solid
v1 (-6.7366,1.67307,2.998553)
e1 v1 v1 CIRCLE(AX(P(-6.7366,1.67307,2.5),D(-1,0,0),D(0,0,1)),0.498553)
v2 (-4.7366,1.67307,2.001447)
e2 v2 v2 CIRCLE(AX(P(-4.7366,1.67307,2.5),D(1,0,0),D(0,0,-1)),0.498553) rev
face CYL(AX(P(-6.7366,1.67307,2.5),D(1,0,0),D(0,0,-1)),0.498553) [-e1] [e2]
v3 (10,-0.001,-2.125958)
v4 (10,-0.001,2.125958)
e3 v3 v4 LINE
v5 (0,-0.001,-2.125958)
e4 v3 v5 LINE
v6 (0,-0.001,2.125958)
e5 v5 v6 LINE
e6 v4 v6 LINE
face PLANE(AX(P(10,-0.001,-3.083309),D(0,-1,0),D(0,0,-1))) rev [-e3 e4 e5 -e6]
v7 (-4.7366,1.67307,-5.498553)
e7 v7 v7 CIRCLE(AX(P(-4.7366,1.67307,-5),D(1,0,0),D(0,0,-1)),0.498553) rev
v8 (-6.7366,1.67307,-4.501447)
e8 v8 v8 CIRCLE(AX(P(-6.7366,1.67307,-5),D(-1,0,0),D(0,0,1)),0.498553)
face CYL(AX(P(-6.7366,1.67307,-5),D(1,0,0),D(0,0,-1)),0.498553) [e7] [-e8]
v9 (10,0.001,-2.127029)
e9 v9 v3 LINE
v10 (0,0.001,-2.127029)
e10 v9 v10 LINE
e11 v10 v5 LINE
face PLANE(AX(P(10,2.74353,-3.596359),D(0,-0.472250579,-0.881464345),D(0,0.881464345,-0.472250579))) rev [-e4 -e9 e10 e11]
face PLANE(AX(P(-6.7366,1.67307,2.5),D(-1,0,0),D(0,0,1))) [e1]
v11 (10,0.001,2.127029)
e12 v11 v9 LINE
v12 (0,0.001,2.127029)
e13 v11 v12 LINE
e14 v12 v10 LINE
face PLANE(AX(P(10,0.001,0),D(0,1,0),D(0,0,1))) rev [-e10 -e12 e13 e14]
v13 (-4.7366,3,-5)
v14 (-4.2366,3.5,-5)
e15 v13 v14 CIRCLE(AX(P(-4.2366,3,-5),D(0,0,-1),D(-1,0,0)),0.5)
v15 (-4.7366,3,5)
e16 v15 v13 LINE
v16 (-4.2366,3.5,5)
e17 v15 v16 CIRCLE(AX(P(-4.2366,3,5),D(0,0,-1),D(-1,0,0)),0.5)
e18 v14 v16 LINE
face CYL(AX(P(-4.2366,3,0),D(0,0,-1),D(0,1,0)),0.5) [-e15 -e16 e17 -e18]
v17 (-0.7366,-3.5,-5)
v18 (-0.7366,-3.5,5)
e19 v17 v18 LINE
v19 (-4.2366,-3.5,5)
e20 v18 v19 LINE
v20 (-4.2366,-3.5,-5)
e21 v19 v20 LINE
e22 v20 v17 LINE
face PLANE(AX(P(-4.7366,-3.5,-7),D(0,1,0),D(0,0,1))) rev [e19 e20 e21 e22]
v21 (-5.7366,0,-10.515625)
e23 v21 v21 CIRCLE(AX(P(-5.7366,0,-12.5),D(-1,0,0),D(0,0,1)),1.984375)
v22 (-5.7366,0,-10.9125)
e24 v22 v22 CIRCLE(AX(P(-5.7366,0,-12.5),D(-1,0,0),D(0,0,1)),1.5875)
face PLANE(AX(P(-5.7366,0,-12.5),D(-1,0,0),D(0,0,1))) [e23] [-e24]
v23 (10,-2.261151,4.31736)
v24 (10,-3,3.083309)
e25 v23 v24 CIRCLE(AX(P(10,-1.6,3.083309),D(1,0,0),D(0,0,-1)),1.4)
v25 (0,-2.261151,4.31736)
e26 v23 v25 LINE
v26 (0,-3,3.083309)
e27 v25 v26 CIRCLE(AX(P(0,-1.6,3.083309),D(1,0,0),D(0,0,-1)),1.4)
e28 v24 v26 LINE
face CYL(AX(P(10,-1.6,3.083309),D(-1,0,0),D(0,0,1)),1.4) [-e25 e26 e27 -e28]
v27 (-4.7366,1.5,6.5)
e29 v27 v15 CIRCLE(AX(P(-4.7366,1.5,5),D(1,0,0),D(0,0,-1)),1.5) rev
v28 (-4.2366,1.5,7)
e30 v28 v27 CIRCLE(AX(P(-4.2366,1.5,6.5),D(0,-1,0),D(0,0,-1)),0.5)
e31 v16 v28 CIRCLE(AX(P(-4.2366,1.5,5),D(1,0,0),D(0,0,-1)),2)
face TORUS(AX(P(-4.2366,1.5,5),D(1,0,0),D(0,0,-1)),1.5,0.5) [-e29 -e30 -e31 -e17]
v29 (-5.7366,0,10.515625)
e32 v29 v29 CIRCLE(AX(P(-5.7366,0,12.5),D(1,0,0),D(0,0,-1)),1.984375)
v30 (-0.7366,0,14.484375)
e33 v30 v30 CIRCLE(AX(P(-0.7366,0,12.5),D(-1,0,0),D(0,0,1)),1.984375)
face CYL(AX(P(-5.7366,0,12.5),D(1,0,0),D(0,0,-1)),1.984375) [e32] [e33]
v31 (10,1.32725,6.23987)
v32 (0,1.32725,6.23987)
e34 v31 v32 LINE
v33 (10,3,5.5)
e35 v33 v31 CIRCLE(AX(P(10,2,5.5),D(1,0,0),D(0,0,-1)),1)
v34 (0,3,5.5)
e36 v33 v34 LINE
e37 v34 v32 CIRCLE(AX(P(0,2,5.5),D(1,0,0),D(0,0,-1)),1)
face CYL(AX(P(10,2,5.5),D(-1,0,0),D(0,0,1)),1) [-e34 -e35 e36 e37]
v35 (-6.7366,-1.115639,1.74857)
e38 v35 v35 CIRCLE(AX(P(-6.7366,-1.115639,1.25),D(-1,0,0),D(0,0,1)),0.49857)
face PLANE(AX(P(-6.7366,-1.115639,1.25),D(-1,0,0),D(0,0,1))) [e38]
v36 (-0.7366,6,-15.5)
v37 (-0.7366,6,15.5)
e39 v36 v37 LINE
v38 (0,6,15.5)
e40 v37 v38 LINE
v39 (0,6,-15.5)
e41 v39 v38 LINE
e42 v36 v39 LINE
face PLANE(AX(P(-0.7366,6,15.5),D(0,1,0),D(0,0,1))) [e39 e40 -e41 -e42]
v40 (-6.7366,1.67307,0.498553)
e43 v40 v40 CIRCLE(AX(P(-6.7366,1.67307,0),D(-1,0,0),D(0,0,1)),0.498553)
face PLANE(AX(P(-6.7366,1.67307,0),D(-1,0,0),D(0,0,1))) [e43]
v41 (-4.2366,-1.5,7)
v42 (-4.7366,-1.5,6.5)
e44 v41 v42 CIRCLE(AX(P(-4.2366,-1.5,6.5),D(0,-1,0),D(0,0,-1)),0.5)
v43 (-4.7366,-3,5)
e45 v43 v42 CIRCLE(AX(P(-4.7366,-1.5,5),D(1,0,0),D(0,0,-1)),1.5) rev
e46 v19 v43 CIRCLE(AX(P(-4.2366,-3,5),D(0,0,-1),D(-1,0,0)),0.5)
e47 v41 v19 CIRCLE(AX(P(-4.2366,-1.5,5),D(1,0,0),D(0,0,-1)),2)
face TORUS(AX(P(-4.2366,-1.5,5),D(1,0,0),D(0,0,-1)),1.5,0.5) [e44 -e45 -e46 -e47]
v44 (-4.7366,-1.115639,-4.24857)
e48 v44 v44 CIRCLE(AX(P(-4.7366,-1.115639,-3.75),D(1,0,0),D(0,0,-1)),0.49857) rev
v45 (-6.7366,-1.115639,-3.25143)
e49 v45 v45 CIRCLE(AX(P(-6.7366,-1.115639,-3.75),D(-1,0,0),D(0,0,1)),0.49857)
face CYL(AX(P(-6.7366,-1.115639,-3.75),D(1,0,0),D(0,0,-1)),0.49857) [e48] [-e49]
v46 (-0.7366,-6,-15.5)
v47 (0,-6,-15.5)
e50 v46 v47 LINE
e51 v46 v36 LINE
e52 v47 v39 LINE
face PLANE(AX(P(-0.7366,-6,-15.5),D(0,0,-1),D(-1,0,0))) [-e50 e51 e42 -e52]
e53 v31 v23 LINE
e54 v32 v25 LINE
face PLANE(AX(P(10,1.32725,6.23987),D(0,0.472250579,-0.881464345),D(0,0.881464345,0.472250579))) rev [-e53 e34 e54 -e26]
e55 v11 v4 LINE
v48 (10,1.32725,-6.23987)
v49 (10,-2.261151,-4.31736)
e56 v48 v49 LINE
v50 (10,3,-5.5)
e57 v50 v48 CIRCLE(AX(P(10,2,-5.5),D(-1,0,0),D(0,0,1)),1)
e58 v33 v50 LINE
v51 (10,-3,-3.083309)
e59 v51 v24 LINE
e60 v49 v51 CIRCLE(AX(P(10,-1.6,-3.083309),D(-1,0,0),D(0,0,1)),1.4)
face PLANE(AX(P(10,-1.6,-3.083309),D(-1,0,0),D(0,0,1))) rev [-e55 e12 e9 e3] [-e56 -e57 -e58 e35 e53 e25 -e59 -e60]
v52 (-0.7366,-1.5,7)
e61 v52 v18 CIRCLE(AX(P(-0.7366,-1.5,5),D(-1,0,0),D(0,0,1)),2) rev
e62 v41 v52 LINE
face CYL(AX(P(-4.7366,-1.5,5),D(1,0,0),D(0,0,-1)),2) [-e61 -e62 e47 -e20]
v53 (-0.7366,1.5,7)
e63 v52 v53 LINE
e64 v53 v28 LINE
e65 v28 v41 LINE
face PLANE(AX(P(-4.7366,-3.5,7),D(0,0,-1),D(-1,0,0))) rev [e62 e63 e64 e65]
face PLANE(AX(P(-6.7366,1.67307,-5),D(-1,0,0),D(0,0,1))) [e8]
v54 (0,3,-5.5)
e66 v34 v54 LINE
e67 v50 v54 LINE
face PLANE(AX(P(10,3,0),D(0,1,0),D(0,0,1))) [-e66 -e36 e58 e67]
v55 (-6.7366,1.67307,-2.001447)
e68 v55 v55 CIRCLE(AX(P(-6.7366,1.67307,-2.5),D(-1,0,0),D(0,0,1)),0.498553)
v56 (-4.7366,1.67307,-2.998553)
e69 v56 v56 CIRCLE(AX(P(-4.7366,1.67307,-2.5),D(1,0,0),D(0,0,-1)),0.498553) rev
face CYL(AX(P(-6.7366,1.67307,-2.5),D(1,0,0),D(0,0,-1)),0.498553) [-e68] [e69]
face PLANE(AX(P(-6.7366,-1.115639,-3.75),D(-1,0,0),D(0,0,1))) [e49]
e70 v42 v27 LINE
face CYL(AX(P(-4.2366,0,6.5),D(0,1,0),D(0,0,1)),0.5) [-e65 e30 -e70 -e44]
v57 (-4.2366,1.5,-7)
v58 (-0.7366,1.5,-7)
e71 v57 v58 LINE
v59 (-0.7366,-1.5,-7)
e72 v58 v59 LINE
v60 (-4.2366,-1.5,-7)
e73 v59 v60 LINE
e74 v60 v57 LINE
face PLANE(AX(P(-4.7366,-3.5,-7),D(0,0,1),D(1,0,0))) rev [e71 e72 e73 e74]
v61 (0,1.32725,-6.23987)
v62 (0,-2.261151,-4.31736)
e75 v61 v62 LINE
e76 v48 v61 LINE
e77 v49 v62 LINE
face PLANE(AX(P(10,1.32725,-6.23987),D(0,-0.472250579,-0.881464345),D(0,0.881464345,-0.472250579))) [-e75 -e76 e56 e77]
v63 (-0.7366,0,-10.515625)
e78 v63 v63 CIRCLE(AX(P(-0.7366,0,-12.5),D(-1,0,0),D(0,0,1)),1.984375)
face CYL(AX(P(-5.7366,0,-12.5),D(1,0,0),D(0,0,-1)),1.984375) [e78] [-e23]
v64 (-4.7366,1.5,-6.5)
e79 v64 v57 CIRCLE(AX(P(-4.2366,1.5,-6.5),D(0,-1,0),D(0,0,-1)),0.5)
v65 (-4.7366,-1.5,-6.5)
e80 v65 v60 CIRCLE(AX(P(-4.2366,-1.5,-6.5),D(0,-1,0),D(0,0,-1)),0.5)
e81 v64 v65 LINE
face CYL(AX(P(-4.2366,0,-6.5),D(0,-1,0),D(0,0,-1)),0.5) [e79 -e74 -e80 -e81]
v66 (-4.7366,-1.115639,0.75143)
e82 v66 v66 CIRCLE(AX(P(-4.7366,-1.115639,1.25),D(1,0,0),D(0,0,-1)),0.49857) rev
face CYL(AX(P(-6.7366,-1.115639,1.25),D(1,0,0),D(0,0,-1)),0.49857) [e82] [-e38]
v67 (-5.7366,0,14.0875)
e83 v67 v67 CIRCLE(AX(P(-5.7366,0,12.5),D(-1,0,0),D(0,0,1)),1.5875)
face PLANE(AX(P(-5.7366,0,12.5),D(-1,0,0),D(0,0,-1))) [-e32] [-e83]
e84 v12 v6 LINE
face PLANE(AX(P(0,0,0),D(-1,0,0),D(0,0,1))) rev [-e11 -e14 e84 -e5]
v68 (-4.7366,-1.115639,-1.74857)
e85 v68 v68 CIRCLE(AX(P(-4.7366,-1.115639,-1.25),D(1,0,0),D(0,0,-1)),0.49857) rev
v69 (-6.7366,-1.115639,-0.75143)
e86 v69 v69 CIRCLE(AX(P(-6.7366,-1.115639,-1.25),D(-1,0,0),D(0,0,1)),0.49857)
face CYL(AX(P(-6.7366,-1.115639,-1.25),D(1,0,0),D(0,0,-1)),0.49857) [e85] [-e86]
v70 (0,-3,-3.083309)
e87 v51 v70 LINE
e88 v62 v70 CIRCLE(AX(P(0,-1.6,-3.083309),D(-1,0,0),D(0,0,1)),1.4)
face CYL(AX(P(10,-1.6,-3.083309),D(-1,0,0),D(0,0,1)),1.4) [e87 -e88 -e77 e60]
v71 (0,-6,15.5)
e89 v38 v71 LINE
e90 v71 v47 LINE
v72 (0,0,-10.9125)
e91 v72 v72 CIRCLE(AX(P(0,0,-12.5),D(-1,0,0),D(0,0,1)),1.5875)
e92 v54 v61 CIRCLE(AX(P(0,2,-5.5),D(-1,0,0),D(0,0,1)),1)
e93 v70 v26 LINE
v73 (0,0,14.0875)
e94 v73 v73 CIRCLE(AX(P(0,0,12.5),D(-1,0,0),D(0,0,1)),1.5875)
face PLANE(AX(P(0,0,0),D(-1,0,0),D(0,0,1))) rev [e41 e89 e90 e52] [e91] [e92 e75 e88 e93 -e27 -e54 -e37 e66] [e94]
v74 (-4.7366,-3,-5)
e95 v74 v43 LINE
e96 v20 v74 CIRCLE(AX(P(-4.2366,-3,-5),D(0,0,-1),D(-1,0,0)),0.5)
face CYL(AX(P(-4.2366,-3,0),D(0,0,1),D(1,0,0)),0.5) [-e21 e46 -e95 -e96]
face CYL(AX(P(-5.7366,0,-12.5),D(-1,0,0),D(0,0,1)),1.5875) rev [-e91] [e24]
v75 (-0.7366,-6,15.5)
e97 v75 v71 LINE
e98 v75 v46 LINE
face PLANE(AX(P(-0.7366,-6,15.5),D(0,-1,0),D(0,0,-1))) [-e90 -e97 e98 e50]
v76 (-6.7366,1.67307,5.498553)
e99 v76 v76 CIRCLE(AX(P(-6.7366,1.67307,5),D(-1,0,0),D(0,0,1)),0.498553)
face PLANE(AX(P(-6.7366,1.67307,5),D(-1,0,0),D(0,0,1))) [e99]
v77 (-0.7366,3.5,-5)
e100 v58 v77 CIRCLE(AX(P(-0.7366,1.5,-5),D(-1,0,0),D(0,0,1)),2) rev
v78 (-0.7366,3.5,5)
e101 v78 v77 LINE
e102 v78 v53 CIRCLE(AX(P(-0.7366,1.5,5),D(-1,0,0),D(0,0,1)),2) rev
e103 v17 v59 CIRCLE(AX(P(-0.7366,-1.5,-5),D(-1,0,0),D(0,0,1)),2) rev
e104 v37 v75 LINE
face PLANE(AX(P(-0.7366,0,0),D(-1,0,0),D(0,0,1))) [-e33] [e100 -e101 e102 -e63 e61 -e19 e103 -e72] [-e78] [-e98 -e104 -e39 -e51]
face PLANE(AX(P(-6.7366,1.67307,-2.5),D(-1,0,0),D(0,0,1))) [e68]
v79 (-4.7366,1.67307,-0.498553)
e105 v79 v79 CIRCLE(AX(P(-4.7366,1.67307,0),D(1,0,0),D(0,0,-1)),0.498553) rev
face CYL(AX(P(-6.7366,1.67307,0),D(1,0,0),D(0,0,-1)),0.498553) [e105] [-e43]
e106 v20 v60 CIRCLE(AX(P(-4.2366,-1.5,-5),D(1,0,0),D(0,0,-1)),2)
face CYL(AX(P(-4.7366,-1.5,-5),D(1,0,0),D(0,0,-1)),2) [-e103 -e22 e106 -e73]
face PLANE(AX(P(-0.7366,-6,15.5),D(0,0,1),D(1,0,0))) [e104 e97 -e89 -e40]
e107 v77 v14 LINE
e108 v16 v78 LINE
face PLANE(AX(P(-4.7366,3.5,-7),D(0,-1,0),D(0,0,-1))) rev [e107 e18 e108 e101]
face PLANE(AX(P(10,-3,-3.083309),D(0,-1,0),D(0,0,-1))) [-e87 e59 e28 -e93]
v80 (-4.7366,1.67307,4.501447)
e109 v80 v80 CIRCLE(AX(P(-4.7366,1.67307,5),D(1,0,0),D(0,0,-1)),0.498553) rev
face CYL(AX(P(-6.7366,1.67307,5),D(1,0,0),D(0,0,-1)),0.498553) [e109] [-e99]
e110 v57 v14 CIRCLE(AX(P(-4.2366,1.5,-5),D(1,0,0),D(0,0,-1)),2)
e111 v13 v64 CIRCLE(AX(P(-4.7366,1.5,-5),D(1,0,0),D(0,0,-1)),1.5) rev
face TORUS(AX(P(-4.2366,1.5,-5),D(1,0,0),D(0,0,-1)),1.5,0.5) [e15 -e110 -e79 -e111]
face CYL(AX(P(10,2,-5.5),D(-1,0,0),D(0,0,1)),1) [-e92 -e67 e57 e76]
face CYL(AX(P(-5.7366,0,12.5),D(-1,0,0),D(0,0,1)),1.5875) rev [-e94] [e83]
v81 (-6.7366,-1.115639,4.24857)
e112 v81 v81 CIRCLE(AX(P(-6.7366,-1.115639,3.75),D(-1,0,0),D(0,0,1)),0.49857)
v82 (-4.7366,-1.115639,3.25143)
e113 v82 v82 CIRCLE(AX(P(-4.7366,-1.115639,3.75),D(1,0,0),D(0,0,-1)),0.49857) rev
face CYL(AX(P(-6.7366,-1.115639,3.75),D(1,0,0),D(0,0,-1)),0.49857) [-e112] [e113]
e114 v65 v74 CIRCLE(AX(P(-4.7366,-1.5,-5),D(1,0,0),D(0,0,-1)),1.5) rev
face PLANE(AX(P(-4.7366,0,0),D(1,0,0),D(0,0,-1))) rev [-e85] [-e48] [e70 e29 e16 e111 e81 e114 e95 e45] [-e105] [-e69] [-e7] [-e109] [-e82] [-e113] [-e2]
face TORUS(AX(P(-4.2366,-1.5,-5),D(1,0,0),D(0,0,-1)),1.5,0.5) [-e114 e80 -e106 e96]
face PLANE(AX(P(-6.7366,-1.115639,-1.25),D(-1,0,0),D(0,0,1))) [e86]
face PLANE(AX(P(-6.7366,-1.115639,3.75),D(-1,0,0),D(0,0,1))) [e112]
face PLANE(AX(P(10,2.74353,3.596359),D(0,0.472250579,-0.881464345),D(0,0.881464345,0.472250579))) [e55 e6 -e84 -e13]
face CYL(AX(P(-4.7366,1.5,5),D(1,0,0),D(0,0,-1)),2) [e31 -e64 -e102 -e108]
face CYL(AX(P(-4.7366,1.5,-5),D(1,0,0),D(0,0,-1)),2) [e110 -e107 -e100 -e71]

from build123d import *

# Parameters (mm, degrees)
SKETCH1_W                    = 31
SKETCH1_H                    = 12
BASE_FLANGE1_DEPTH           = 0.7366
EXTRUDE_THIN3_DEPTH          = 10
SKETCH8_W                    = 14
SKETCH8_H                    = 7
BOSS_EXTRUDE1_DEPTH          = 4
FILLET2_R                    = 2
FILLET3_R                    = 0.5
SKETCH9_R                    = 0.498553058
BOSS_EXTRUDE2_DEPTH          = 2
SKETCH10_R                   = 0.49857
BOSS_EXTRUDE3_DEPTH          = 2
SKETCH11_R                   = 1.984375
BOSS_EXTRUDE4_DEPTH          = 5
F_1_8_0_125_DIAMETER_HOLE1_D = 3.175


# Sheet-metal steps are written as plain solids
with BuildPart() as part:
    # Sketch1 → Base-Flange1 (new body)
    with BuildSketch(Plane(origin=(0, 0, 0), x_dir=(0, 0, -1), z_dir=(1, 0, 0))):
        Rectangle(SKETCH1_W, SKETCH1_H)
    extrude(amount=-BASE_FLANGE1_DEPTH)

    # Sketch6 → Extrude-Thin3 (add)
    with BuildSketch(Plane(origin=(0, 0, 0), x_dir=(0, 0, -1), z_dir=(1, 0, 0))):
        with BuildLine():
            Line((0, 3), (5.5, 3))
            ThreePointArc((5.5, 3), (6.414535338, 2.404506015), (6.23987009, 1.327250232))
            Line((6.23987009, 1.327250232), (4.317359578, -2.26115081))
            ThreePointArc((4.317359578, -2.26115081), (3.802471809, -2.801168417), (3.083309495, -3))
            Line((3.083309495, -3), (0, -3))
            Line((0, -3), (0, -0.001))
            Line((0, -0.001), (2.125957868, -0.001))
            Line((2.125957868, -0.001), (2.127029382, 0.001))
            Line((2.127029382, 0.001), (0, 0.001))
            Line((0, 0.001), (0, 3))
        make_face()
    extrude_thin3 = extrude(amount=EXTRUDE_THIN3_DEPTH)

    # Mirror1: Extrude-Thin3 across plane
    add(extrude_thin3.mirror(Plane.XY))

    # Sketch8 → Boss-Extrude1 (add)
    with BuildSketch(Plane.ZY.offset(0.7366)):
        Rectangle(SKETCH8_W, SKETCH8_H)
    extrude(amount=BOSS_EXTRUDE1_DEPTH)

    # Fillet2
    fillet2_edges = [part.edges().sort_by_distance(p)[0] for p in [
        (-2.7366, -3.5, 7),
        (-2.7366, 3.5, 7),
        (-2.7366, 3.5, -7),
        (-2.7366, -3.5, -7),
    ]]
    fillet(fillet2_edges, radius=FILLET2_R)

    # Fillet3
    fillet3_edges = [part.edges().sort_by_distance(p)[0] for p in [
        (-4.7366, 0, 7),
        (-4.7366, -3.5, 0),
        (-4.7366, 3.5, 0),
        (-4.7366, 0, -7),
        (-4.7366, 2.914213562, -6.414213562),
        (-4.7366, -2.914213562, -6.414213562),
        (-4.7366, 2.914213562, 6.414213562),
        (-4.7366, -2.914213562, 6.414213562),
    ]]
    fillet(fillet3_edges, radius=FILLET3_R)

    # Sketch9 → Boss-Extrude2 (add)
    with BuildSketch(Plane.ZY.offset(4.7366)):
        with Locations(Location((-5, 1.673069628, 0), (0, 0, 180))):
            Circle(SKETCH9_R)
        with Locations(Location((-2.5, 1.673069628, 0), (0, 0, 180))):
            Circle(SKETCH9_R)
        with Locations(Location((0, 1.673069628, 0), (0, 0, 180))):
            Circle(SKETCH9_R)
        with Locations(Location((2.5, 1.673069628, 0), (0, 0, 180))):
            Circle(SKETCH9_R)
        with Locations(Location((5, 1.673069628, 0), (0, 0, 180))):
            Circle(SKETCH9_R)
    extrude(amount=BOSS_EXTRUDE2_DEPTH)

    # Sketch10 → Boss-Extrude3 (add)
    with BuildSketch(Plane.ZY.offset(4.7366)):
        with Locations(Location((-3.75, -1.115638979, 0), (0, 0, 180))):
            Circle(SKETCH10_R)
        with Locations(Location((-1.25, -1.115638979, 0), (0, 0, 180))):
            Circle(SKETCH10_R)
        with Locations(Location((1.25, -1.115638979, 0), (0, 0, 180))):
            Circle(SKETCH10_R)
        with Locations(Location((3.75, -1.115638979, 0), (0, 0, 180))):
            Circle(SKETCH10_R)
    extrude(amount=BOSS_EXTRUDE3_DEPTH)

    # Sketch11 → Boss-Extrude4 (add)
    with BuildSketch(Plane.ZY.offset(0.7366)):
        with Locations((-12.5, 0)):
            Circle(SKETCH11_R)
    boss_extrude4 = extrude(amount=BOSS_EXTRUDE4_DEPTH)

    # Mirror2: Boss-Extrude4 across plane
    add(boss_extrude4.mirror(Plane.XY))

    # 1/8 (0.125) Diameter Hole1 (through all)
    with Locations(Plane.ZY.offset(5.7366)):
        with Locations((-12.5, 0)):
            f_1_8_0_125_diameter_hole1 = Hole(F_1_8_0_125_DIAMETER_HOLE1_D / 2)

    # Mirror3: 1/8 (0.125) Diameter Hole1 across plane
    add(f_1_8_0_125_diameter_hole1.mirror(Plane.XY), mode=Mode.SUBTRACT)


solid = part.part
